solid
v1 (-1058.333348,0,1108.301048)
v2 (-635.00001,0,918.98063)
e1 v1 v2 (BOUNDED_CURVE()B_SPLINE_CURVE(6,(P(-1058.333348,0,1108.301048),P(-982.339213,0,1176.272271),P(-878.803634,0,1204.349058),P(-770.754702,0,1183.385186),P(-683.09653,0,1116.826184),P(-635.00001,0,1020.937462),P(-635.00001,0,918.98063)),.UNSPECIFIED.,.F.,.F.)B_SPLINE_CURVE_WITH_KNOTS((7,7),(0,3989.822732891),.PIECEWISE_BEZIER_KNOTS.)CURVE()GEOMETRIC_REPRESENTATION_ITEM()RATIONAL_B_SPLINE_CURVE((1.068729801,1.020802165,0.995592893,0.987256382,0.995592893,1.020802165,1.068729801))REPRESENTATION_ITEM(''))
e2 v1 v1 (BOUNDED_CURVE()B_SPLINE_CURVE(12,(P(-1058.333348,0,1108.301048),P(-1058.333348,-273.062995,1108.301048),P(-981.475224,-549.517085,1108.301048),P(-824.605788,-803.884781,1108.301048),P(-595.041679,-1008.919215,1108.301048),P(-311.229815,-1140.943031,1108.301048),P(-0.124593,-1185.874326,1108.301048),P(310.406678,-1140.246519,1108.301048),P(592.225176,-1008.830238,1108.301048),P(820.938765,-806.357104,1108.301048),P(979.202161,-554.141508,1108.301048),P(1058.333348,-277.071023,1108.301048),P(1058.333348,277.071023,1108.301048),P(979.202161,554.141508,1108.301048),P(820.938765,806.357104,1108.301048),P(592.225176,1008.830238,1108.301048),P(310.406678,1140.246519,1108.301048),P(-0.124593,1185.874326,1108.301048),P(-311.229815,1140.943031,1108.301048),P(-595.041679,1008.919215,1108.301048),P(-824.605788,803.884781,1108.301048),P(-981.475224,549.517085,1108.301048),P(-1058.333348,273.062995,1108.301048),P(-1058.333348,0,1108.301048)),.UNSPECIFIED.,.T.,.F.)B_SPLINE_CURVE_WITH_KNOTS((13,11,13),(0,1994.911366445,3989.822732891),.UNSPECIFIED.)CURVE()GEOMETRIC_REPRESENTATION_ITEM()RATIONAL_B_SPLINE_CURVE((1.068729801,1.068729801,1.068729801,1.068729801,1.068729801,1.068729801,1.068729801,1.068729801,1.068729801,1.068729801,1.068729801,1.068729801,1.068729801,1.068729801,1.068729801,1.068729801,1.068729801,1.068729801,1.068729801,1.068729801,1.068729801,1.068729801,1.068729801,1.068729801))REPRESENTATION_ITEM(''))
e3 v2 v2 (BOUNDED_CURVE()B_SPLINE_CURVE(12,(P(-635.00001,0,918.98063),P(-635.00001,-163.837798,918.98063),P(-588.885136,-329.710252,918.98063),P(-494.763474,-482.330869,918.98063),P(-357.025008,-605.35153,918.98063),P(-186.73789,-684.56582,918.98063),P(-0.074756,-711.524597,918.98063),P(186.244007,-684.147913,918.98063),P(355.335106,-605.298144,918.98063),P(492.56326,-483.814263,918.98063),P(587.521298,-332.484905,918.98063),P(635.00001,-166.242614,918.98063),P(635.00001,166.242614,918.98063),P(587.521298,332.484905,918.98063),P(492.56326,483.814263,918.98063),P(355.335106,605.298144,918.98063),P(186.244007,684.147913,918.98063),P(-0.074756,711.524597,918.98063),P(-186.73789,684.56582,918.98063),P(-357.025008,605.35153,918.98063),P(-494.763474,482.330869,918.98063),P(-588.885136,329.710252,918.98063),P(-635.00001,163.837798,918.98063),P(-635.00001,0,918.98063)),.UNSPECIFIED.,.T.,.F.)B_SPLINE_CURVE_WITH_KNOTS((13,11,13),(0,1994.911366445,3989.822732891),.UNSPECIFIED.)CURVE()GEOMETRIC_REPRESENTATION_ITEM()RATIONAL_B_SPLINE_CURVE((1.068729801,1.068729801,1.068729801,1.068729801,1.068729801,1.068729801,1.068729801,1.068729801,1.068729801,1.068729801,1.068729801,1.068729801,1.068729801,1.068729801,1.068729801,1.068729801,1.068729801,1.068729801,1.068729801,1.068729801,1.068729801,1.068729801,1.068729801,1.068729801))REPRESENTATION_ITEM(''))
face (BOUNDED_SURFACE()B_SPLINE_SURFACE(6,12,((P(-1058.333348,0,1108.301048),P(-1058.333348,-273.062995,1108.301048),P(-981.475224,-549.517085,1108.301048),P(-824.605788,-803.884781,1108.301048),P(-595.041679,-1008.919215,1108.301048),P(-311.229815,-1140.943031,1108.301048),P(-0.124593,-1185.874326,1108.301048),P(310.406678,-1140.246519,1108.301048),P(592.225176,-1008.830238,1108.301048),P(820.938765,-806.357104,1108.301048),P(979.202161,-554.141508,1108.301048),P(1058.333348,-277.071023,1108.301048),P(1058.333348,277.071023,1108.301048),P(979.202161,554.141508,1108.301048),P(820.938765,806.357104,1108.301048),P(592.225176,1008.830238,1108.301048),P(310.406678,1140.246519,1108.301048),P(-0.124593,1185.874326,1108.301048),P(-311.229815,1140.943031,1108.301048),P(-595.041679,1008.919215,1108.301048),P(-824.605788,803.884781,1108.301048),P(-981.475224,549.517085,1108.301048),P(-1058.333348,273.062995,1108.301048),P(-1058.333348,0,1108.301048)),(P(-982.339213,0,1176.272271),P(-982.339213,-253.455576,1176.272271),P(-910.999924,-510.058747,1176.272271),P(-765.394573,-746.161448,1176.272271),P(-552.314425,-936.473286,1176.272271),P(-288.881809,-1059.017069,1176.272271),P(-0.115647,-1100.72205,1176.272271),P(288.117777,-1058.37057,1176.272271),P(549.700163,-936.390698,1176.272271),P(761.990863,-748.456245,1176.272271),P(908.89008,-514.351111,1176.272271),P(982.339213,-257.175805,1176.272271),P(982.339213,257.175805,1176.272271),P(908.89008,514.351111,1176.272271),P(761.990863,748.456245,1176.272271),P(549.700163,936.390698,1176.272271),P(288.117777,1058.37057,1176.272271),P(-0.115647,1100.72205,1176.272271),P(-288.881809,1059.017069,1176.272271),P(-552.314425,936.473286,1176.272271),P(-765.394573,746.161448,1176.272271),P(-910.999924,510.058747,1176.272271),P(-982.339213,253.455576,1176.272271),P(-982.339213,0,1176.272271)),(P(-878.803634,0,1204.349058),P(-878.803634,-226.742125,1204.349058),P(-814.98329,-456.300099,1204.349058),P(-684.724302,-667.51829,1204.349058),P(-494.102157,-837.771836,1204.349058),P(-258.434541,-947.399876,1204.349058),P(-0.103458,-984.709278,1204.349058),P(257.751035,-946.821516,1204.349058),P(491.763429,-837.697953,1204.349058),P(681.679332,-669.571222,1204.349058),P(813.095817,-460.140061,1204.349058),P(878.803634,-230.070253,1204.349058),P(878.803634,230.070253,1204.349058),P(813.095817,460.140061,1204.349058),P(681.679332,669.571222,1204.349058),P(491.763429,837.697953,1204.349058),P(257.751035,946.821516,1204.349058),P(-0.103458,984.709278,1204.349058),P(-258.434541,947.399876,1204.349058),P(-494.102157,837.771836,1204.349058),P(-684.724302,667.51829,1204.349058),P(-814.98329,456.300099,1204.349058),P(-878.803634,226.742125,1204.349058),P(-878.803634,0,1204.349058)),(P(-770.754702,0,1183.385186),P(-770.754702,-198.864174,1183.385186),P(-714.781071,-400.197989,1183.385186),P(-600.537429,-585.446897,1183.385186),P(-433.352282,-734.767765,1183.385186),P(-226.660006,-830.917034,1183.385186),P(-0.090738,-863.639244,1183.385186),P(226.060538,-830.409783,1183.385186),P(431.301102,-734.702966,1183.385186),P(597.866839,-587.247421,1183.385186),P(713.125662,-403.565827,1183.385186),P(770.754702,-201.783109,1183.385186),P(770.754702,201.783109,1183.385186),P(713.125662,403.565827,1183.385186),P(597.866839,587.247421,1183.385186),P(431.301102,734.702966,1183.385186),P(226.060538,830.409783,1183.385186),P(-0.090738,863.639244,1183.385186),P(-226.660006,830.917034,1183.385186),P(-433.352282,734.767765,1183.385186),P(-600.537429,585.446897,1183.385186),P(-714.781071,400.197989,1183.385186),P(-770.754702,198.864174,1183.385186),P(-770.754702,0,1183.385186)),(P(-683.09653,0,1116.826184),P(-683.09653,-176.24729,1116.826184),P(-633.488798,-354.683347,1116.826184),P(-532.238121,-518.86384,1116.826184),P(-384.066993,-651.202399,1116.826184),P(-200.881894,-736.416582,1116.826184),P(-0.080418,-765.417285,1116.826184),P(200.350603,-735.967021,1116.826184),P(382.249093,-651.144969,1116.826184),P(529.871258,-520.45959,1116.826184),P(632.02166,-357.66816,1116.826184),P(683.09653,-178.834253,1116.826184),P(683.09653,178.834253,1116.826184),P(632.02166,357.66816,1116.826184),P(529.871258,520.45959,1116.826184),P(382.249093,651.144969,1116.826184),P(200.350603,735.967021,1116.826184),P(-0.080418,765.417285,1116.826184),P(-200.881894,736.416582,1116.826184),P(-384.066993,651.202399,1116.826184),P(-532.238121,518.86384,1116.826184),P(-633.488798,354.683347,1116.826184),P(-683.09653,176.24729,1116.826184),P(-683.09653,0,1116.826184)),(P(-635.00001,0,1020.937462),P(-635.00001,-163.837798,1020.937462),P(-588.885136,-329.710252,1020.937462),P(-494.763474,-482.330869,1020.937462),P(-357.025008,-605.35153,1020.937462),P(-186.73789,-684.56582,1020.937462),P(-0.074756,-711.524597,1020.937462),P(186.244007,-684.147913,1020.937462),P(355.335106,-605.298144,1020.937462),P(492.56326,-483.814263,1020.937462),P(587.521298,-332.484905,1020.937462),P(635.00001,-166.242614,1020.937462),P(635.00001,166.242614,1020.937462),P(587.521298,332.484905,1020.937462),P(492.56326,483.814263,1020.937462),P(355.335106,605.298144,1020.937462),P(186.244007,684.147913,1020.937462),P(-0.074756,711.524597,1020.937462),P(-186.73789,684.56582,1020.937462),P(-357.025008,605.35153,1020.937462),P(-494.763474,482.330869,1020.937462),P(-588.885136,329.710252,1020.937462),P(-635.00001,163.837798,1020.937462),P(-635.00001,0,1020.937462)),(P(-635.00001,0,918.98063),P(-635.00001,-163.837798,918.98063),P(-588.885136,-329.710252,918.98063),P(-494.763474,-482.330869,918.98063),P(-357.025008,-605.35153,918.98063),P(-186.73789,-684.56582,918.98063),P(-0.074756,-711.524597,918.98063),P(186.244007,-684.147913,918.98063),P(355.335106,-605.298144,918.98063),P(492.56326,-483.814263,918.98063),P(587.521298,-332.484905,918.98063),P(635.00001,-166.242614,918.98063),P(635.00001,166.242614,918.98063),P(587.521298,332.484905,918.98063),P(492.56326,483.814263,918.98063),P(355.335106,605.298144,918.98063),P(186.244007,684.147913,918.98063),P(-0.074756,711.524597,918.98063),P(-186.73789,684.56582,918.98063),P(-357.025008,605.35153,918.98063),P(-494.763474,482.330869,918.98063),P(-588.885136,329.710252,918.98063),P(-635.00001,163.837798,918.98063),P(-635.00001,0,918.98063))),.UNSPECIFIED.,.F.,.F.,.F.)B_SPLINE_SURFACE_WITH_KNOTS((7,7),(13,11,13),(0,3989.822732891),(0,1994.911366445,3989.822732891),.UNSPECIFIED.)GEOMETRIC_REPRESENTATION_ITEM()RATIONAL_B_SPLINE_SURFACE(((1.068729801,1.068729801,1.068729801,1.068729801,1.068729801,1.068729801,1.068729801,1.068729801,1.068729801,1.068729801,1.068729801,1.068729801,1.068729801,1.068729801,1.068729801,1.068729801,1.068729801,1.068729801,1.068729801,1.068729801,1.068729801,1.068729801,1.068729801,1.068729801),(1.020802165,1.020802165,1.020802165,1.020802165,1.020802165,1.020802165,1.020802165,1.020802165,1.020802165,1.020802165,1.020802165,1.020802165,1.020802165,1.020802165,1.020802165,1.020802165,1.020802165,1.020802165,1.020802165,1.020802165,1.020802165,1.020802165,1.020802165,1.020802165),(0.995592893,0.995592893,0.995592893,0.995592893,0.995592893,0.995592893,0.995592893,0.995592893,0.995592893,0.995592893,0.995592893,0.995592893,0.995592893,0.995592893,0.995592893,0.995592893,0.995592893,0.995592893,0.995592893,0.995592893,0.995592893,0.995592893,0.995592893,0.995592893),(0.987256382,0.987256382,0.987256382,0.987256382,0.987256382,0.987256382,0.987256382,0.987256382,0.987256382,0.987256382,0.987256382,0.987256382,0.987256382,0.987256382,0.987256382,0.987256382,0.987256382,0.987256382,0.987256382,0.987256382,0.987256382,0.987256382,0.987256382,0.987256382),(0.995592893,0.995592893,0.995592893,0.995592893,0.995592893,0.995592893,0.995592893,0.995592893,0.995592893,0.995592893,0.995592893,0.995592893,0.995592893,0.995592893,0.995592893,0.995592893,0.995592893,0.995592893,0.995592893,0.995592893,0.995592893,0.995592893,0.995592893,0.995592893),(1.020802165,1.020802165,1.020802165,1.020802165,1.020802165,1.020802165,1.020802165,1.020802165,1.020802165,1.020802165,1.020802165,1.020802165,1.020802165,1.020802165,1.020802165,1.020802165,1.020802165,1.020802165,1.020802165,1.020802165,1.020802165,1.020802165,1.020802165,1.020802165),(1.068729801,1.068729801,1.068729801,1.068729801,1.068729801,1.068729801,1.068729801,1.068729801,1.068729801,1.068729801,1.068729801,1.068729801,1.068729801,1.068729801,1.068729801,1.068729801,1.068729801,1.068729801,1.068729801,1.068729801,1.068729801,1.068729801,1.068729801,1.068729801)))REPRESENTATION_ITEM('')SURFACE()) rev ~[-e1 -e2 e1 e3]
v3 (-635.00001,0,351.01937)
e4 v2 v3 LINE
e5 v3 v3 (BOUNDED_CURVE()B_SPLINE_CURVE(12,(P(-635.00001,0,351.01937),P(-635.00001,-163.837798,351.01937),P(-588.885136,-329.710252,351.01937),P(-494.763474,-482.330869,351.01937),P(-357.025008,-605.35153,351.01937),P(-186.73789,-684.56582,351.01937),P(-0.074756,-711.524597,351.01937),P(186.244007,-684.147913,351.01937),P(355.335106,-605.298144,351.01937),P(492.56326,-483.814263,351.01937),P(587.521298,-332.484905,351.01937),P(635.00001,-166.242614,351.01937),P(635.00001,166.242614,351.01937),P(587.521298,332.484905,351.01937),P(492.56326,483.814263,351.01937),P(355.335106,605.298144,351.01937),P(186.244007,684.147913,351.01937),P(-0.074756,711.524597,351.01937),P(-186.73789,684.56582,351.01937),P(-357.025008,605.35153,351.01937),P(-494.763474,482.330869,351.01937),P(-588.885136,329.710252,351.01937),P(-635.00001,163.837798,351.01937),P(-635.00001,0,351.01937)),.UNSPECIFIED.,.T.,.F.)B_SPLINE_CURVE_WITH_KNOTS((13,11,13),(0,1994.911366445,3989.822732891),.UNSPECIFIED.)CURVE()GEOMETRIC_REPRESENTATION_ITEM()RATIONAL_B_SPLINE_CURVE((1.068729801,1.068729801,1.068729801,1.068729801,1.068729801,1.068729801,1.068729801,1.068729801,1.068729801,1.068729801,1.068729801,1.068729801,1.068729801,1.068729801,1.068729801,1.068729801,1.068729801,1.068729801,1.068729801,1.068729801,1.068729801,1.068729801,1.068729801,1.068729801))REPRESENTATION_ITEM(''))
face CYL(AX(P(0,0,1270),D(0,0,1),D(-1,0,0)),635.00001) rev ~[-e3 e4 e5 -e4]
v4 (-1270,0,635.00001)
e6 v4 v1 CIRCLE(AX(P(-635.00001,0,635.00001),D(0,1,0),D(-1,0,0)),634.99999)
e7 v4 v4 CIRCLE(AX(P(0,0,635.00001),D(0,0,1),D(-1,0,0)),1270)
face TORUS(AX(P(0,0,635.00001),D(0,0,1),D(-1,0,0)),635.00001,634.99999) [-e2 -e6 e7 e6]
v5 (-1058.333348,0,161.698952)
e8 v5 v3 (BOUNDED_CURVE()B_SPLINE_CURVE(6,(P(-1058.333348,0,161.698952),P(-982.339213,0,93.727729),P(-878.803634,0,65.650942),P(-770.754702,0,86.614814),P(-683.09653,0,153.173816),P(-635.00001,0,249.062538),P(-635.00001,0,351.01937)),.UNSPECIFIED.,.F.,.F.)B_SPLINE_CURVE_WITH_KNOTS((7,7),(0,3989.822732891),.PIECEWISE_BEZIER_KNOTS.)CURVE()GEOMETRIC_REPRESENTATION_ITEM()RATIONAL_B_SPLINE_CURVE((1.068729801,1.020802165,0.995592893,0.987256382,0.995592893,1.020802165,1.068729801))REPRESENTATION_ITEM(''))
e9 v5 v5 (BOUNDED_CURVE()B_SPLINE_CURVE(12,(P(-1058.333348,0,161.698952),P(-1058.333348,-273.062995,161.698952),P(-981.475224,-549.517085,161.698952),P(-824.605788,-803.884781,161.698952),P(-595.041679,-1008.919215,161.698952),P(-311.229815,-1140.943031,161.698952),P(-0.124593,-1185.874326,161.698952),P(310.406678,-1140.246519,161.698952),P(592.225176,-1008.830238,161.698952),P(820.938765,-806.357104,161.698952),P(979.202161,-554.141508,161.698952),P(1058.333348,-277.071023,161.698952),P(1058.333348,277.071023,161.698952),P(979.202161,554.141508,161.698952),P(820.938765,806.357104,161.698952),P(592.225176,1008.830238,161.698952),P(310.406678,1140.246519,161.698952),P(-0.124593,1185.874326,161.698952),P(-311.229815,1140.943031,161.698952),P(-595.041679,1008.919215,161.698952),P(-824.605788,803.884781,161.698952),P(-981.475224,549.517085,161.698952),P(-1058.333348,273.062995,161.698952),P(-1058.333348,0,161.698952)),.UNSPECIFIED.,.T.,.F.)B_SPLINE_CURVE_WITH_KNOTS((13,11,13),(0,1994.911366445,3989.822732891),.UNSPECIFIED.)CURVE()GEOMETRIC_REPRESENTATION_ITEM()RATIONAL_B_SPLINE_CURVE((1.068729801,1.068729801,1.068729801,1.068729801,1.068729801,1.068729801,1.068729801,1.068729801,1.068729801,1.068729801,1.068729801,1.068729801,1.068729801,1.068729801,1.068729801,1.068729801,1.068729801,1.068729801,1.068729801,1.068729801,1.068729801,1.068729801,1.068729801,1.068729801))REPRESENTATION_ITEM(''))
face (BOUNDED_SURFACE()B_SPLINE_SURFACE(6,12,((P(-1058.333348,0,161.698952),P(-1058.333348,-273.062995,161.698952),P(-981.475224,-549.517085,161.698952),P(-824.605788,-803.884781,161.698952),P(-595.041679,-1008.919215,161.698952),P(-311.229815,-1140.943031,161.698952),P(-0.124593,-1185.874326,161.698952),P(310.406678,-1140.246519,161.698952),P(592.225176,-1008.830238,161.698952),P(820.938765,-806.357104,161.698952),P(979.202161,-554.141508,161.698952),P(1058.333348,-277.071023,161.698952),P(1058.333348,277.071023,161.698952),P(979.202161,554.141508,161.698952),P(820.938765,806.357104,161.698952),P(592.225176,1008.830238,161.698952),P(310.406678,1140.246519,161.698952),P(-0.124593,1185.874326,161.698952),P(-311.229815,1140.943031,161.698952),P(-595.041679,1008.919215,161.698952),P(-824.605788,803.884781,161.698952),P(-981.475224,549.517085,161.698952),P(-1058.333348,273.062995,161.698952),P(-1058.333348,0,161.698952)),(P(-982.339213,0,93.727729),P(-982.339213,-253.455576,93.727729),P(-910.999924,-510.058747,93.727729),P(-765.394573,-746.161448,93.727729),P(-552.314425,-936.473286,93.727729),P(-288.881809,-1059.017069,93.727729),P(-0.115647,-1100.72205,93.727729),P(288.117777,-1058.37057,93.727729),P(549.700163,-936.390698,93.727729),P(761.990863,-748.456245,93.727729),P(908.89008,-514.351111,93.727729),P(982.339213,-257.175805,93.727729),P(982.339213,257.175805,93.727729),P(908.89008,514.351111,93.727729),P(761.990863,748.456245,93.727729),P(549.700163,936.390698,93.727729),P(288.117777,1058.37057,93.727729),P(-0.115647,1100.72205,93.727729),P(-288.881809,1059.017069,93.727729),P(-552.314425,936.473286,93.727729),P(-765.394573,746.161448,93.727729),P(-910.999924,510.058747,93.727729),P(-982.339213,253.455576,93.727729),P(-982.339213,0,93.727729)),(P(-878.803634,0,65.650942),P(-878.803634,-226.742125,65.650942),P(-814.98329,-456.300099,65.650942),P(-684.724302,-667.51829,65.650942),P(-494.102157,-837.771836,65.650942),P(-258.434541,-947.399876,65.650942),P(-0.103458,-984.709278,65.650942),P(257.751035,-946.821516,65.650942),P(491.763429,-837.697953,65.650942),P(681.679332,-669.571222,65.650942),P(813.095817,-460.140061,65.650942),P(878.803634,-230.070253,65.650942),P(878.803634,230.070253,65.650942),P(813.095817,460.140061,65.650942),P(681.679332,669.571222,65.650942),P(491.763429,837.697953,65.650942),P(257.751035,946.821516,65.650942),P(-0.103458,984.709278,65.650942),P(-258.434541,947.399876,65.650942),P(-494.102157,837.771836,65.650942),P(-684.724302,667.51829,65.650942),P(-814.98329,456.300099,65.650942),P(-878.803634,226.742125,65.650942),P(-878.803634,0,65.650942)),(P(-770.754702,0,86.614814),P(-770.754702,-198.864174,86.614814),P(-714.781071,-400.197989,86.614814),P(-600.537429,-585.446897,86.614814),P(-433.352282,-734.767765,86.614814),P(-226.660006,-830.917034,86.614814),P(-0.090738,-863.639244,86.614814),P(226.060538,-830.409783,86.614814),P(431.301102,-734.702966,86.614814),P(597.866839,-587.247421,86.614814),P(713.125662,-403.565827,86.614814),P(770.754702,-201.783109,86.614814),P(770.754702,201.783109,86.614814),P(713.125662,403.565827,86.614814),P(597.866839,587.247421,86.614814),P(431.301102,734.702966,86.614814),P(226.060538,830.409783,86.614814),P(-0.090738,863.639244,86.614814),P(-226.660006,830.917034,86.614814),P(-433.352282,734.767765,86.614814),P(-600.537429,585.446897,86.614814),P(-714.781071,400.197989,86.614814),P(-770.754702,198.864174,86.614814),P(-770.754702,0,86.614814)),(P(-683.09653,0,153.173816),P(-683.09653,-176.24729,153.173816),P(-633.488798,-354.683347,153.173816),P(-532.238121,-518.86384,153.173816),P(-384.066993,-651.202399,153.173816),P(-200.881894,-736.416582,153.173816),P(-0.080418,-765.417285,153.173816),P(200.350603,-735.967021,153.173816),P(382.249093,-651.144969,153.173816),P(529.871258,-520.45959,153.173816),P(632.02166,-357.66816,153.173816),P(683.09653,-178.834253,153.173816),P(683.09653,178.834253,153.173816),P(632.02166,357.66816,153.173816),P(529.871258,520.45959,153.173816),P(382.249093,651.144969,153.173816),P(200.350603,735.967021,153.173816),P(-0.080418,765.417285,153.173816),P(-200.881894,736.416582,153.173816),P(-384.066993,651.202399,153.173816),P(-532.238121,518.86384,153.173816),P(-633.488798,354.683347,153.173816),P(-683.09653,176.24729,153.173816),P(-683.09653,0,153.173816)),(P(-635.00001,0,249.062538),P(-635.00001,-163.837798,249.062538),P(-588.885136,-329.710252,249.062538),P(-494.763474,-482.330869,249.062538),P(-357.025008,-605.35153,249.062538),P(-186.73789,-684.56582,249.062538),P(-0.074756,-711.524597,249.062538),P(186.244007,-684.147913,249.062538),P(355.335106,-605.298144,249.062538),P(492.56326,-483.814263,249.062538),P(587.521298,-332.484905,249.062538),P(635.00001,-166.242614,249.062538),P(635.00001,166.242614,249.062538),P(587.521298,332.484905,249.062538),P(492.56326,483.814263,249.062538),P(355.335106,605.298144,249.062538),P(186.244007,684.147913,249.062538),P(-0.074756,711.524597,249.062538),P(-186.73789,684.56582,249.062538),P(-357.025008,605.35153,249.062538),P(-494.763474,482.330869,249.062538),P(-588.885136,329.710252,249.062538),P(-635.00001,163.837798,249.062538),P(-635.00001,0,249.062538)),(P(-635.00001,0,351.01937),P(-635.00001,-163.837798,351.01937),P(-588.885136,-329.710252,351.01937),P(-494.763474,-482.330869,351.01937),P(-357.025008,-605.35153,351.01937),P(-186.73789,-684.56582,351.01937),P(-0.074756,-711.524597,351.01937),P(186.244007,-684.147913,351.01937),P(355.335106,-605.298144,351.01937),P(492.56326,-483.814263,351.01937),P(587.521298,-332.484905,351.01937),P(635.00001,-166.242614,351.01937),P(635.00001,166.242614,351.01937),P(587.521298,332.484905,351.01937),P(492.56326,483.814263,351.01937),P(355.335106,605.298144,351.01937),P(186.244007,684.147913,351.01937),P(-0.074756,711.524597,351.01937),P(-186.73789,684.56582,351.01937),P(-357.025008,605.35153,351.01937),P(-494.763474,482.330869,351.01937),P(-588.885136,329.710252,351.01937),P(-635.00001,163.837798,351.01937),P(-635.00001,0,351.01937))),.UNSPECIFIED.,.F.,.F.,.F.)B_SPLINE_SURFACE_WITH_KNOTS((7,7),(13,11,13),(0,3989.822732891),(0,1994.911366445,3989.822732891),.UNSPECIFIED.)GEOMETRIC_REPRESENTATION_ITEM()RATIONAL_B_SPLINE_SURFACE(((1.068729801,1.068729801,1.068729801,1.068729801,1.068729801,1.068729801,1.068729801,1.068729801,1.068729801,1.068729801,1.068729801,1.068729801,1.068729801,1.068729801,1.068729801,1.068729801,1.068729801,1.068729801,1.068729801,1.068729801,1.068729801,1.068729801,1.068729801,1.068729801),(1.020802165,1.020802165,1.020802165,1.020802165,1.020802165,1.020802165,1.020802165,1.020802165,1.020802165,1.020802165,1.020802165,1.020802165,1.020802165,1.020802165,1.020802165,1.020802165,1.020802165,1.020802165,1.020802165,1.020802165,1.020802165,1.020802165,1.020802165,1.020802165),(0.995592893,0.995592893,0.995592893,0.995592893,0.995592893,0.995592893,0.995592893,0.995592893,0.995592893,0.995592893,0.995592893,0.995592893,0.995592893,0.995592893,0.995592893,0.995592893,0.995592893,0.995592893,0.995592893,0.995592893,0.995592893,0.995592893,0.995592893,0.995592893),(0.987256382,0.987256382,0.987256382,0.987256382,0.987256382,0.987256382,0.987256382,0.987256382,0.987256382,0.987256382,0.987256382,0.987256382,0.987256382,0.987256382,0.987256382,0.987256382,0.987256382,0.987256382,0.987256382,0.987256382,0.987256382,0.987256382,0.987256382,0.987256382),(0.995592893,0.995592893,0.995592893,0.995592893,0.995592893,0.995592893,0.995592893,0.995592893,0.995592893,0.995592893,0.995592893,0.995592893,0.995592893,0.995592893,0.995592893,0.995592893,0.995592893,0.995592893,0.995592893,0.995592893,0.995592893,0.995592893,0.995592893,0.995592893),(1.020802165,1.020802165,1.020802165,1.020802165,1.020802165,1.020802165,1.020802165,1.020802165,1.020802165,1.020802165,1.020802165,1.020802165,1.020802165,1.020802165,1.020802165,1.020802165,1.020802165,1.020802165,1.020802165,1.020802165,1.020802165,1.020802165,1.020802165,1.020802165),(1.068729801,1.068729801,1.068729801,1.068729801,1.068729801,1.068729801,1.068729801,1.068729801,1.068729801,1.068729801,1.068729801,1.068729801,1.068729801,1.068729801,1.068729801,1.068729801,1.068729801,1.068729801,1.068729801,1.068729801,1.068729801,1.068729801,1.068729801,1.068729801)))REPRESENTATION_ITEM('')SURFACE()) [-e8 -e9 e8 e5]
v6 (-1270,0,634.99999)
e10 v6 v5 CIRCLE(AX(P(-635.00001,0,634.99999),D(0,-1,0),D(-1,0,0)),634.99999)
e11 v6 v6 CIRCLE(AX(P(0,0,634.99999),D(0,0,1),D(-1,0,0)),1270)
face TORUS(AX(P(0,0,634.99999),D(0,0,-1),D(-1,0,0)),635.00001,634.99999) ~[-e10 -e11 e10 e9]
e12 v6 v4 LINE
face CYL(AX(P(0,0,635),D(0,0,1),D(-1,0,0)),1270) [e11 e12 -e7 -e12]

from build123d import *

# Parameters (mm, degrees)
F0_W     = 1270
F0_H     = 1270
F2_R     = 634.99999
F3_DEPTH = 1270.001
F4_R     = 254


# Not quite as in the source:
# - a fillet or chamfer is up to 0.001 mm smaller than in the source, because OpenCascade refuses the exact size


with BuildPart() as f1:
    # F0 (on Front) → F1 (revolve)
    with BuildSketch(Plane.XZ):
        with Locations((-635, 635)):
            Rectangle(F0_W, F0_H)
    revolve(axis=Axis((0, 0, 635), (0, 0, 1)))

    # F2 (radius 635 in the source; OpenCascade refuses exactly that, so slightly less here)
    f2_edges = [f1.edges().sort_by_distance(p)[0] for p in [
        (1270, 0, 1270),
        (1270, 0, 0),
        (-1270, 0, 635),
    ]]
    fillet(f2_edges, radius=F2_R)

    # F3 (cut, through all): a face of the model
    f3_faces = [f1.faces().sort_by_distance(p)[0] for p in [
        (0, 0, 1270),
    ]]
    extrude(f3_faces, amount=-F3_DEPTH, mode=Mode.SUBTRACT)

    # F4
    f4_edges = [f1.edges().sort_by_distance(p)[0] for p in [
        (635.00001, 0, 1270),
        (635.00001, 0, 0),
    ]]
    fillet(f4_edges, radius=F4_R)


solid = f1.part
